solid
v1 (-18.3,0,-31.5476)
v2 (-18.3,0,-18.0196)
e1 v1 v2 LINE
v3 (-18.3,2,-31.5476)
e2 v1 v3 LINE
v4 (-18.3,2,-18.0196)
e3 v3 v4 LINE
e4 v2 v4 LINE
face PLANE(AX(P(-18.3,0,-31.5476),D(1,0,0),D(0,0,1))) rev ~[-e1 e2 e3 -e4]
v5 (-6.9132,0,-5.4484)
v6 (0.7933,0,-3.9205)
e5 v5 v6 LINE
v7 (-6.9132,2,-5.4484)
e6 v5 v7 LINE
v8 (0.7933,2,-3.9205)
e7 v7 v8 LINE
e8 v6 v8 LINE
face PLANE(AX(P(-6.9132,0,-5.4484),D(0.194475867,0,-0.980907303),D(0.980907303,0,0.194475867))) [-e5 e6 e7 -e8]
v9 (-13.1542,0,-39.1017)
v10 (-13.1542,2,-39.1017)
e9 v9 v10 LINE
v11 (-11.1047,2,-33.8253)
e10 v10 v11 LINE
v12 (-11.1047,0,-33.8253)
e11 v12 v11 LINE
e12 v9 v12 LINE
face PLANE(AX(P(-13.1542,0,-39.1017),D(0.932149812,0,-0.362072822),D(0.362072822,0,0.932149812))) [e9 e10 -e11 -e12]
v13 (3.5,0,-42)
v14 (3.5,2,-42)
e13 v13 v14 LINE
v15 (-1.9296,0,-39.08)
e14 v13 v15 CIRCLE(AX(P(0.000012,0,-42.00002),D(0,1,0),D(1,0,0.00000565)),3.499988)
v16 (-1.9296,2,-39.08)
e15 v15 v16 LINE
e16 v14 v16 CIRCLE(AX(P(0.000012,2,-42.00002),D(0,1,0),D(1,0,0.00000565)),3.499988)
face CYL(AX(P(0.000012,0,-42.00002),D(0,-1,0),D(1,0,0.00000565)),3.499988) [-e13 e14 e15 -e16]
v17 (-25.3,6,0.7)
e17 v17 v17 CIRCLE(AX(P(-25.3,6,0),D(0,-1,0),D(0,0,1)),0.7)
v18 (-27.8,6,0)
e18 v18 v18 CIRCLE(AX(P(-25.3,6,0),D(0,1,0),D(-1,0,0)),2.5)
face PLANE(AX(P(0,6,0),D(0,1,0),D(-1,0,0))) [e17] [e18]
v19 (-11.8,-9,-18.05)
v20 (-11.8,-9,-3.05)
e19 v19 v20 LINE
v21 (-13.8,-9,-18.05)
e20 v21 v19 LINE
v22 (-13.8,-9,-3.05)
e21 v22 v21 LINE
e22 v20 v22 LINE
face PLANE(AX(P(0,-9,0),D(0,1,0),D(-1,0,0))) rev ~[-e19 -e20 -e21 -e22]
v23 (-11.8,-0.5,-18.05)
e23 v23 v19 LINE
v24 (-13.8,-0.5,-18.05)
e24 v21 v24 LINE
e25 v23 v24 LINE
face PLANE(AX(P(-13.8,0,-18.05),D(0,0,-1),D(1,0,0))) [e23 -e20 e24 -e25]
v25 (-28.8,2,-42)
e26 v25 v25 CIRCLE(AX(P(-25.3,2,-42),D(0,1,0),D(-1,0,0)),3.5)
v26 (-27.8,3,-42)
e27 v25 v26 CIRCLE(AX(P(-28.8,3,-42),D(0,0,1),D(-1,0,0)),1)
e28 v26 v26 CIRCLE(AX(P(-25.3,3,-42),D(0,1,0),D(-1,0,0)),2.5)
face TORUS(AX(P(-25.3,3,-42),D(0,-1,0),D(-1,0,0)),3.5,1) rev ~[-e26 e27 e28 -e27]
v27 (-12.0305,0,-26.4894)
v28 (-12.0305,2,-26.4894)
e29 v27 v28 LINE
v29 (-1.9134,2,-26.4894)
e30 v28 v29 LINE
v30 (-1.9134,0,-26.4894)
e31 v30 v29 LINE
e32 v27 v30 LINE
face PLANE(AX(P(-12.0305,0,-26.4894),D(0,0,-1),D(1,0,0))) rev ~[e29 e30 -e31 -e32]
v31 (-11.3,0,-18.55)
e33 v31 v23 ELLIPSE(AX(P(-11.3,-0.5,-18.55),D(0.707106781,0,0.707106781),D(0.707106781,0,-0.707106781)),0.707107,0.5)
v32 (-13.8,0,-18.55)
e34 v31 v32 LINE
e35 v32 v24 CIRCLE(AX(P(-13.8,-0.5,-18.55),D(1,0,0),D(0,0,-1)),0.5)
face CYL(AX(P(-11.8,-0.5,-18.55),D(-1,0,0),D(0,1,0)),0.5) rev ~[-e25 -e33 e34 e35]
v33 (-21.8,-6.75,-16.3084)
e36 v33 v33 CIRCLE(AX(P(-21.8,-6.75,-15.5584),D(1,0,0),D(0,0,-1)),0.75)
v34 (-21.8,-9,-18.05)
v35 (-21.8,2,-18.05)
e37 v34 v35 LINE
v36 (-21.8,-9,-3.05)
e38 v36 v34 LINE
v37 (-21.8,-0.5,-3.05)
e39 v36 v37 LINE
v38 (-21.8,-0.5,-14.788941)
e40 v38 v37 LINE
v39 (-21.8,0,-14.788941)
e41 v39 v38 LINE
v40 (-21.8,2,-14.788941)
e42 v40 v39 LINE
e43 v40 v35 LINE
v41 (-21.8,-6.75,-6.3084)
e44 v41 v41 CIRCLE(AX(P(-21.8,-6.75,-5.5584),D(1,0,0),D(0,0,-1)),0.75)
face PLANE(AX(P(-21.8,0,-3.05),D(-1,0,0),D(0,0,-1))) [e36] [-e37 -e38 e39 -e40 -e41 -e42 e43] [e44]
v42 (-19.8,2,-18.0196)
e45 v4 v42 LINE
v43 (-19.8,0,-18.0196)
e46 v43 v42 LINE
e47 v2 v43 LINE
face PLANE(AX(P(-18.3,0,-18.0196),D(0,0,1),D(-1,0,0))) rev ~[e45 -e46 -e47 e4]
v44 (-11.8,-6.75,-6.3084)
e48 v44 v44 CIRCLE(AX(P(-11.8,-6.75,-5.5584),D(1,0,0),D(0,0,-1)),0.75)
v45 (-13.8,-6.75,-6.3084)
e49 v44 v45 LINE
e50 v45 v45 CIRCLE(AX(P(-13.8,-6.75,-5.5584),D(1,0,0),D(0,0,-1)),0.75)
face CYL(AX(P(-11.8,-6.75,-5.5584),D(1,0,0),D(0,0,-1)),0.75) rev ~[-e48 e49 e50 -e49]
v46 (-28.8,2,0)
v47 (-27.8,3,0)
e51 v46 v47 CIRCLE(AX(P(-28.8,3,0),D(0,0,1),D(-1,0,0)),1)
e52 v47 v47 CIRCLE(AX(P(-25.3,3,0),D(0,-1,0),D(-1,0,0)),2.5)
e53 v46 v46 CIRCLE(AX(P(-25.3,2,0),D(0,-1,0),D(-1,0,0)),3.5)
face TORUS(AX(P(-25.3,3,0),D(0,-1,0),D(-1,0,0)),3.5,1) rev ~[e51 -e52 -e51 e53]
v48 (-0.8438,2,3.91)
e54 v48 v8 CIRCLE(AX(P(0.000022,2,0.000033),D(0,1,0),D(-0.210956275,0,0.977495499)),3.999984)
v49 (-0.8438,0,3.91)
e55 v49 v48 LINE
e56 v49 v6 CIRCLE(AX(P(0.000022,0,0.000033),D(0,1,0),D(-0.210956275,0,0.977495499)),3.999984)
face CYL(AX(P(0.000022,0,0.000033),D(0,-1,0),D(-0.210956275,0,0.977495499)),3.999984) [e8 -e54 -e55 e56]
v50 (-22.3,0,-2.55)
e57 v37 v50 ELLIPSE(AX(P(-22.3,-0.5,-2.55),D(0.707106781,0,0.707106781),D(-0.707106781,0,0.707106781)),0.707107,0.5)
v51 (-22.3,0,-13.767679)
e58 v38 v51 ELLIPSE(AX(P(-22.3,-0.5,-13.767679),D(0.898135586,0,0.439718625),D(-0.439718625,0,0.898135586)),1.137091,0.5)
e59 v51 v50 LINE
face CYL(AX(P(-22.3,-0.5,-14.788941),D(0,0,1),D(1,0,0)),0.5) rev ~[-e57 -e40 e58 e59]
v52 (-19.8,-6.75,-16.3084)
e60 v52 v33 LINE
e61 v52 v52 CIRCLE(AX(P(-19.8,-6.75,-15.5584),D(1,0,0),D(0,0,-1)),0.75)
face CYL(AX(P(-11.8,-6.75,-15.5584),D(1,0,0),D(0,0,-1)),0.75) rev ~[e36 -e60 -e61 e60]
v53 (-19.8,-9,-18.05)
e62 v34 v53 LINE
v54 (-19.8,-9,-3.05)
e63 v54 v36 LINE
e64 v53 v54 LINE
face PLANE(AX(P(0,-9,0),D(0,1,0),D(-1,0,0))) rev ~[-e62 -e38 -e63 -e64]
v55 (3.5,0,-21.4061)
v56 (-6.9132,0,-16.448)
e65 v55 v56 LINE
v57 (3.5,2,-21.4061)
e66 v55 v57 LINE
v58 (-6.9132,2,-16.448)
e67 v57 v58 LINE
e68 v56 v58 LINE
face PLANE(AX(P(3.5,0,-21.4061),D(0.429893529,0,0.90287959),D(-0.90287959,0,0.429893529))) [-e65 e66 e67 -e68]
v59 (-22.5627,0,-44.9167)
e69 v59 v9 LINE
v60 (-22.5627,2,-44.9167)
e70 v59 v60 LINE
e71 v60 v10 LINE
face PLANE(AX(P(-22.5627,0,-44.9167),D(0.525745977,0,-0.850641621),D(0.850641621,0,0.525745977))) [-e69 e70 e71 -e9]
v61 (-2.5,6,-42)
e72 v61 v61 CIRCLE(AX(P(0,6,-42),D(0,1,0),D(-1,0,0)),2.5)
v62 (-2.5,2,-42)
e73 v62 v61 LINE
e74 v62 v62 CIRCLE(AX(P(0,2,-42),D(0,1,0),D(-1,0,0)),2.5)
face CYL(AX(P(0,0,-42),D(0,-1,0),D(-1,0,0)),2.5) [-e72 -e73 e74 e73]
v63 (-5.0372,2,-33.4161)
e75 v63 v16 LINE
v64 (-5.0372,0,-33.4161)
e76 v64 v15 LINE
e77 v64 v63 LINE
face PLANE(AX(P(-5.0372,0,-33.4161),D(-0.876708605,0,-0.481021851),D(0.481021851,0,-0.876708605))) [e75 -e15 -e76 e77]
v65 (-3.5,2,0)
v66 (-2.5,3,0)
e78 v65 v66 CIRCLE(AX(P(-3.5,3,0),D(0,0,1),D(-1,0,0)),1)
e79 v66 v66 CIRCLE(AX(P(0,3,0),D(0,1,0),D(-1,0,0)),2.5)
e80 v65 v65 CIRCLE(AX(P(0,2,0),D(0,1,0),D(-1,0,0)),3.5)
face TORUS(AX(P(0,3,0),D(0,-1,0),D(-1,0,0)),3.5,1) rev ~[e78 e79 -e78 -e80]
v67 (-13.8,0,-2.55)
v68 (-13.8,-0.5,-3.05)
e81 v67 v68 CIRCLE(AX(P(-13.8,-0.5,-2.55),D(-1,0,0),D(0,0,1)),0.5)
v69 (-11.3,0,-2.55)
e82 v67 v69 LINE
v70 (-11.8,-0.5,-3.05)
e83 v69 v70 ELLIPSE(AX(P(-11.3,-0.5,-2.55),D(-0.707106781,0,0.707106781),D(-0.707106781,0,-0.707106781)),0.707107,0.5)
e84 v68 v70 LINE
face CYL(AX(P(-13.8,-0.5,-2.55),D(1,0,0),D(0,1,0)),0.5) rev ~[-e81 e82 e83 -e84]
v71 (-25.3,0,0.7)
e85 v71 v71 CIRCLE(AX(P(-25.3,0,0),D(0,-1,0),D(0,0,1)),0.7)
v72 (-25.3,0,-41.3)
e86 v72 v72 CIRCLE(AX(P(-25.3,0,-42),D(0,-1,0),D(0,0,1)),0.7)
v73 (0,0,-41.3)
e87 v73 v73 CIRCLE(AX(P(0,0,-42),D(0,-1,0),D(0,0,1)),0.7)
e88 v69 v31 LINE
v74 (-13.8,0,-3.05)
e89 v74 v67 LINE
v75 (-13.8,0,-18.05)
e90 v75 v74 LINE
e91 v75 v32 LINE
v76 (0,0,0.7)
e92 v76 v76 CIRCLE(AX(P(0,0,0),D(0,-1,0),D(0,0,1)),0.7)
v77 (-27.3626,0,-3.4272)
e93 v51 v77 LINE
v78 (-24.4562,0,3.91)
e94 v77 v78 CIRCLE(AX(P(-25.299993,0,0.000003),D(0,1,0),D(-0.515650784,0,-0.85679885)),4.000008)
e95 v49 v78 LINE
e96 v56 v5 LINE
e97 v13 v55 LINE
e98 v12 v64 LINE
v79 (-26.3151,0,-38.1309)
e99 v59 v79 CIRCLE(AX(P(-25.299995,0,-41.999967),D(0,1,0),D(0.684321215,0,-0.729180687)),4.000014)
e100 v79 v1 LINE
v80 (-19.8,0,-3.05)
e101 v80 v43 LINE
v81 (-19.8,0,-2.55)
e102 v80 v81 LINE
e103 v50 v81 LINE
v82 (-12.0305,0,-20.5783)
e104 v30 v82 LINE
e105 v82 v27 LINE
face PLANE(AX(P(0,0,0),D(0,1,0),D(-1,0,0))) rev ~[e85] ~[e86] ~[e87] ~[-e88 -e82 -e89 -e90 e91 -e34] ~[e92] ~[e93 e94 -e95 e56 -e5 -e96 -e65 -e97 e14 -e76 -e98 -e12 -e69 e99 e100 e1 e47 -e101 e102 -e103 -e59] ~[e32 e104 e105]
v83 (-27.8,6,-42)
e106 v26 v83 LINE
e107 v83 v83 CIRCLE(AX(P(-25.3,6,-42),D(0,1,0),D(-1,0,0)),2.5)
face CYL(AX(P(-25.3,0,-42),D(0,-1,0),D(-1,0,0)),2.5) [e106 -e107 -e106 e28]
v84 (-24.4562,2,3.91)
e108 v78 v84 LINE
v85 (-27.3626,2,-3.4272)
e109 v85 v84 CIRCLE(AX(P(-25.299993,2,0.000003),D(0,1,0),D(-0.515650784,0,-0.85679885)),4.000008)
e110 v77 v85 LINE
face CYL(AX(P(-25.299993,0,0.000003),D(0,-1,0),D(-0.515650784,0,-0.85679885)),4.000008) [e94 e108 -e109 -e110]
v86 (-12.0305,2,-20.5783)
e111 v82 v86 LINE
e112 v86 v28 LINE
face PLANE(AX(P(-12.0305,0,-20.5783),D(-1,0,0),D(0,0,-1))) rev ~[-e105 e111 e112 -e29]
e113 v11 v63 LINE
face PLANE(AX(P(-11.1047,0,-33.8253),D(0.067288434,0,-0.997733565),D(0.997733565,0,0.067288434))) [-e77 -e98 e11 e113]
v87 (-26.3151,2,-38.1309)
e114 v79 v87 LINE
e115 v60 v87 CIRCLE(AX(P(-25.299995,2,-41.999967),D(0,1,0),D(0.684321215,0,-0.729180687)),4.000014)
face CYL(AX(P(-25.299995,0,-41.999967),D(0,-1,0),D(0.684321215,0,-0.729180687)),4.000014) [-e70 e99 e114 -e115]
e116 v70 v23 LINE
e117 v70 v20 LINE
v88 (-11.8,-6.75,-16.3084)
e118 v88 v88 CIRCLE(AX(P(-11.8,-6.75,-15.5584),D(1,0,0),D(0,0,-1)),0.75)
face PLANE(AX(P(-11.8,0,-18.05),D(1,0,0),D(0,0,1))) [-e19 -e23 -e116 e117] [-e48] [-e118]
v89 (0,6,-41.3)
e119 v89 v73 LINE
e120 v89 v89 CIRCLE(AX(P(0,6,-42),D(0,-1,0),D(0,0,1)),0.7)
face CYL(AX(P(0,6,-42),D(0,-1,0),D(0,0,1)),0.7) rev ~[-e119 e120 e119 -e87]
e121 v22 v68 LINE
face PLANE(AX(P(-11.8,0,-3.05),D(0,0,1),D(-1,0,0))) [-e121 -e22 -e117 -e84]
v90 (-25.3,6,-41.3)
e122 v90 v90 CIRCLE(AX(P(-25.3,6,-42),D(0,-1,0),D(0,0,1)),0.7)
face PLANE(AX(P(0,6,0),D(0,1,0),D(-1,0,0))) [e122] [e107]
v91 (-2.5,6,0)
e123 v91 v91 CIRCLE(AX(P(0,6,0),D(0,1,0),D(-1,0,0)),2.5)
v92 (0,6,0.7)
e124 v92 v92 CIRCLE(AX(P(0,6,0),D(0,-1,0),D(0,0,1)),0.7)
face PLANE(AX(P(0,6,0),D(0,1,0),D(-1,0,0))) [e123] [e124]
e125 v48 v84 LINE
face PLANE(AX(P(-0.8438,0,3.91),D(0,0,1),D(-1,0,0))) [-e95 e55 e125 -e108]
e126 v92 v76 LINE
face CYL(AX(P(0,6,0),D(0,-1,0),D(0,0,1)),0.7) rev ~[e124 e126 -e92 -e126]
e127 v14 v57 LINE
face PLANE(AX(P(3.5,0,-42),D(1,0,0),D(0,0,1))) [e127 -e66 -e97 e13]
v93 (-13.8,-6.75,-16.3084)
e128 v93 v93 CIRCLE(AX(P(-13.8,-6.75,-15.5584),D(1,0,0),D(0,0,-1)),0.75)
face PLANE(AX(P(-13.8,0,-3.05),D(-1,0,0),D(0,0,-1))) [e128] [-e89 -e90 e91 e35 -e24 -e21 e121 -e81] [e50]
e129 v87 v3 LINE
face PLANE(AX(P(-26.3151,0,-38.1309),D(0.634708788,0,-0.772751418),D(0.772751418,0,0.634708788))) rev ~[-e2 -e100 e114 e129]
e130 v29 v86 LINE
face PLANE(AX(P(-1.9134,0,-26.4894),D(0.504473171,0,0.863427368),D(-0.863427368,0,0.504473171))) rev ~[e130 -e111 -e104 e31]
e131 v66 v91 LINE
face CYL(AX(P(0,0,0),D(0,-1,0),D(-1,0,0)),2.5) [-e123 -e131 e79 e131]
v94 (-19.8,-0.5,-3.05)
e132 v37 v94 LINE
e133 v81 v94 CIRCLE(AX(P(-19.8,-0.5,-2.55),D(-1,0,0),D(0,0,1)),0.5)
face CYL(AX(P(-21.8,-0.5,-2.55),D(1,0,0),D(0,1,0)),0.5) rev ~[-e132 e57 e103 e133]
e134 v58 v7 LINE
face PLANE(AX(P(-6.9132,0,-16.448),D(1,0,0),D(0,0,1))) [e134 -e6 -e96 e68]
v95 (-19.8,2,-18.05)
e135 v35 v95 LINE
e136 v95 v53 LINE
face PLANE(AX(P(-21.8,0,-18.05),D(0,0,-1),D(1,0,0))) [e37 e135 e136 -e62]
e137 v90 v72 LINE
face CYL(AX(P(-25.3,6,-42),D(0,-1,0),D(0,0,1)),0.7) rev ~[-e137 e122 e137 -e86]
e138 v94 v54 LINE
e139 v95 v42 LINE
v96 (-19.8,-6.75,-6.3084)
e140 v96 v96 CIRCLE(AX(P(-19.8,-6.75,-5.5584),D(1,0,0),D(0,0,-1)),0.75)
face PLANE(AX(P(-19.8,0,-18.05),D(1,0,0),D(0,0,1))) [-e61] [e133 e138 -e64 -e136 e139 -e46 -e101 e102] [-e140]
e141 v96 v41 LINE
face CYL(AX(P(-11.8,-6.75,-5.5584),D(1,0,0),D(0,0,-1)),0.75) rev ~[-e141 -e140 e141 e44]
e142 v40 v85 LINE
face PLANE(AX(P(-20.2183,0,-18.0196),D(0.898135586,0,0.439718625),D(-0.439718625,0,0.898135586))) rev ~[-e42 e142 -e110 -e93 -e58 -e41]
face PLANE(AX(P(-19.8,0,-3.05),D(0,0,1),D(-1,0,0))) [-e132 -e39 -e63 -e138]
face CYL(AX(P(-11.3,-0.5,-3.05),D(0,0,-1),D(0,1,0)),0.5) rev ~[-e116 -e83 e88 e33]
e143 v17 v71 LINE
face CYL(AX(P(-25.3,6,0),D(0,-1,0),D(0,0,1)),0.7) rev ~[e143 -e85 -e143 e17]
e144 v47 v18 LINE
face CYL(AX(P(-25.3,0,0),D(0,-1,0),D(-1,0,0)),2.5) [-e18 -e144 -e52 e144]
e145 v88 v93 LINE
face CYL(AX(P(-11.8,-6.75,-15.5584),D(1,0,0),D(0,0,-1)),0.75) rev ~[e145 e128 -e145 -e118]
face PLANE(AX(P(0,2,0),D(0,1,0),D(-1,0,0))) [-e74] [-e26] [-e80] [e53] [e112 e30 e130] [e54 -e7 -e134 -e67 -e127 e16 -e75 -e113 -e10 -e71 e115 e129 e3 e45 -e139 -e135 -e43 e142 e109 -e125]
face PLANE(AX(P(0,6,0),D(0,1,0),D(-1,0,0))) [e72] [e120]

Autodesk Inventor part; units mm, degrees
ref_plane "YZ Plane" through (0, 0, 0) normal (1, 0, 0) x (0, 1, 0)
ref_plane "XZ Plane" through (0, 0, 0) normal (0, 1, 0) x (-1, 0, 0)
ref_plane "XY Plane" through (0, 0, 0) normal (0, 0, 1) x (1, 0, 0)
sketch "Sketch1" plane through (0, 0, 0) normal (0, 1, 0) x (-1, 0, 0)
  line L0 (0, 0) -> (25.3, 0) construction
  line L1 (25.3, 0) -> (25.3, -42) construction
  line L2 (25.3, -42) -> (0, -42) construction
  line L3 (0, -42) -> (0, 0) construction
  circle A0 centre (25.3, 0) radius 2.5
  circle A1 centre (0, 0) radius 2.5
  circle A2 centre (0, -42) radius 2.5
  circle A3 centre (25.3, -42) radius 2.5
  dimension "d0" = 25.3
  dimension "d1" = 42
  dimension "d2" = 5
  dimension "d3" = 5
  dimension "d4" = 5
  dimension "d5" = 5
extrude "Extrusion1" add sketch "Sketch1" along normal blind 6
sketch "Sketch2" plane through (0, 0, 0) normal (0, 1, 0) x (-1, 0, 0)
  circle A0 centre (0, 0) radius 2.5 projected
  arc A1 (0.8438, 3.91) -> (-0.7933, -3.9205) centre (0, 0) ccw
  arc A2 (27.3626, -3.4272) -> (24.4562, 3.91) centre (25.3, 0) ccw
  circle A3 centre (25.3, -42) radius 2.5 projected
  arc A4 (22.5627, -44.9167) -> (26.3151, -38.1309) centre (25.3, -42) ccw
  circle A5 centre (0, -42) radius 2.5 projected
  arc A6 (-3.5, -42) -> (1.9296, -39.08) centre (0, -42) ccw
  line L0 (26.3151, -38.1309) -> (18.3, -31.5476)
  line L1 (0.8438, 3.91) -> (24.4562, 3.91)
  line L2 (6.9132, -16.448) -> (6.9132, -5.4484)
  line L3 (6.9132, -5.4484) -> (-0.7933, -3.9205)
  line L4 (18.3, -31.5476) -> (18.3, -18.0196)
  line L5 (-3.5, -42) -> (-3.5, -21.4061)
  line L6 (-3.5, -21.4061) -> (6.9132, -16.448)
  line L7 (22.5627, -44.9167) -> (13.1542, -39.1017)
  line L8 (13.1542, -39.1017) -> (11.1047, -33.8253)
  line L9 (11.1047, -33.8253) -> (5.0372, -33.4161)
  line L10 (35.6, -30.5) -> (19.8, -30.5) construction
  line L11 (19.8, -30.5) -> (19.8, -14.4) construction
  line L12 (19.8, -14.4) -> (35.6, -14.4) construction
  line L13 (35.6, -14.4) -> (35.6, -30.5) construction
  circle A7 centre (8, -39.2) radius 4.55 construction
  line L14 (-2.3049, -15.9586) -> (4, -15.9586) construction
  line L15 (4, -15.9586) -> (4, -6.2) construction
  line L16 (4, -6.2) -> (-2.3049, -6.2) construction
  line L17 (-2.3049, -6.2) -> (-2.3049, -15.9586) construction
  line L18 (5.0372, -33.4161) -> (1.9296, -39.08)
  line L19 (12.0305, -26.4894) -> (1.9134, -26.4894)
  line L20 (1.9134, -26.4894) -> (12.0305, -20.5783)
  line L21 (12.0305, -20.5783) -> (12.0305, -26.4894)
  line L22 (18.3, -18.0196) -> (20.2183, -18.0196)
  line L23 (20.2183, -18.0196) -> (27.3626, -3.4272)
  dimension "d8" = 8
  dimension "d9" = 8
  dimension "d10" = 8
  dimension "d11" = 7
  dimension "d15" = 7
  dimension "d18" = 15.8
  dimension "d19" = 11.5
  dimension "d20" = 16.1
  dimension "d21" = 2.8
  dimension "d22" = 8
  dimension "d23" = 9.1
  dimension "d24" = 6.2
  dimension "d25" = 4
  dimension "d26" = 9.7586
  dimension "d27" = 6.3049
  dimension "d28" = 5.5
extrude "Extrusion2" add sketch "Sketch2" along normal blind 2
hole "Hole1" at (-25.3, 6, 0) direction (0, -1, 0) diameter 1.4 depth 8 tip angle 118
hole "Hole2" at (-25.3, 6, -42) direction (0, -1, 0) diameter 1.4 depth 8 tip angle 118
hole "Hole3" at (0, 6, -42) direction (0, -1, 0) diameter 1.4 depth 8 tip angle 118
hole "Hole4" at (0, 6, 0) direction (0, -1, 0) diameter 1.4 depth 8 tip angle 118
sketch "Sketch3" plane through (0, 0, 0) normal (0, 1, 0) x (-1, 0, 0)
  line L0 (21.8, -18.05) -> (19.8, -18.05)
  line L1 (19.8, -18.05) -> (19.8, -3.05)
  line L2 (19.8, -3.05) -> (21.8, -3.05)
  line L3 (21.8, -3.05) -> (21.8, -18.05)
  circle A0 centre (25.3, 0) radius 0.7 construction
  circle A1 centre (25.3, -42) radius 0.7 construction
  circle A2 centre (0, -42) radius 0.7 construction
  circle A3 centre (0, 0) radius 0.7 construction
  line L4 (13.8, -18.05) -> (11.8, -18.05)
  line L5 (11.8, -18.05) -> (11.8, -3.05)
  line L6 (11.8, -3.05) -> (13.8, -3.05)
  line L7 (13.8, -3.05) -> (13.8, -18.05)
  dimension "d69" = 2
  dimension "d70" = 15
  dimension "d73" = 3.5
  dimension "d74" = 18.05
  dimension "d79" = 2
  dimension "d80" = 6
extrude "Extrusion3" add sketch "Sketch3" along normal blind 2 and the other way blind 9
fillet "Fillet1" radius 1 3 edges at (-22.8, 2, -42) (2.5, 2, 0) (-22.8, 2, 0)
sketch "Sketch4" plane through (-11.8, -9, -3.05) normal (1, 0, 0) x (0, 0, -1)
  circle A0 centre (12.5084, 2.25) radius 0.75
  circle A1 centre (2.5084, 2.25) radius 0.75
  line L0 (18.3561, 9) -> (13.398, 9) projected
  point P0 (-3.05, 9)
  dimension "d83" = 1.5
  dimension "d84" = 10
  dimension "d85" = 6.75
extrude "Extrusion4" cut sketch "Sketch4" against normal through all
fillet "Fillet2" radius 0.5 5 edges at (-11.8, 0, -10.55) (-21.8, 0, -8.9195) (-20.8, 0, -3.05) (-12.8, 0, -3.05) (-12.8, 0, -18.05)
properties part number "gimbal_controller_holder"
